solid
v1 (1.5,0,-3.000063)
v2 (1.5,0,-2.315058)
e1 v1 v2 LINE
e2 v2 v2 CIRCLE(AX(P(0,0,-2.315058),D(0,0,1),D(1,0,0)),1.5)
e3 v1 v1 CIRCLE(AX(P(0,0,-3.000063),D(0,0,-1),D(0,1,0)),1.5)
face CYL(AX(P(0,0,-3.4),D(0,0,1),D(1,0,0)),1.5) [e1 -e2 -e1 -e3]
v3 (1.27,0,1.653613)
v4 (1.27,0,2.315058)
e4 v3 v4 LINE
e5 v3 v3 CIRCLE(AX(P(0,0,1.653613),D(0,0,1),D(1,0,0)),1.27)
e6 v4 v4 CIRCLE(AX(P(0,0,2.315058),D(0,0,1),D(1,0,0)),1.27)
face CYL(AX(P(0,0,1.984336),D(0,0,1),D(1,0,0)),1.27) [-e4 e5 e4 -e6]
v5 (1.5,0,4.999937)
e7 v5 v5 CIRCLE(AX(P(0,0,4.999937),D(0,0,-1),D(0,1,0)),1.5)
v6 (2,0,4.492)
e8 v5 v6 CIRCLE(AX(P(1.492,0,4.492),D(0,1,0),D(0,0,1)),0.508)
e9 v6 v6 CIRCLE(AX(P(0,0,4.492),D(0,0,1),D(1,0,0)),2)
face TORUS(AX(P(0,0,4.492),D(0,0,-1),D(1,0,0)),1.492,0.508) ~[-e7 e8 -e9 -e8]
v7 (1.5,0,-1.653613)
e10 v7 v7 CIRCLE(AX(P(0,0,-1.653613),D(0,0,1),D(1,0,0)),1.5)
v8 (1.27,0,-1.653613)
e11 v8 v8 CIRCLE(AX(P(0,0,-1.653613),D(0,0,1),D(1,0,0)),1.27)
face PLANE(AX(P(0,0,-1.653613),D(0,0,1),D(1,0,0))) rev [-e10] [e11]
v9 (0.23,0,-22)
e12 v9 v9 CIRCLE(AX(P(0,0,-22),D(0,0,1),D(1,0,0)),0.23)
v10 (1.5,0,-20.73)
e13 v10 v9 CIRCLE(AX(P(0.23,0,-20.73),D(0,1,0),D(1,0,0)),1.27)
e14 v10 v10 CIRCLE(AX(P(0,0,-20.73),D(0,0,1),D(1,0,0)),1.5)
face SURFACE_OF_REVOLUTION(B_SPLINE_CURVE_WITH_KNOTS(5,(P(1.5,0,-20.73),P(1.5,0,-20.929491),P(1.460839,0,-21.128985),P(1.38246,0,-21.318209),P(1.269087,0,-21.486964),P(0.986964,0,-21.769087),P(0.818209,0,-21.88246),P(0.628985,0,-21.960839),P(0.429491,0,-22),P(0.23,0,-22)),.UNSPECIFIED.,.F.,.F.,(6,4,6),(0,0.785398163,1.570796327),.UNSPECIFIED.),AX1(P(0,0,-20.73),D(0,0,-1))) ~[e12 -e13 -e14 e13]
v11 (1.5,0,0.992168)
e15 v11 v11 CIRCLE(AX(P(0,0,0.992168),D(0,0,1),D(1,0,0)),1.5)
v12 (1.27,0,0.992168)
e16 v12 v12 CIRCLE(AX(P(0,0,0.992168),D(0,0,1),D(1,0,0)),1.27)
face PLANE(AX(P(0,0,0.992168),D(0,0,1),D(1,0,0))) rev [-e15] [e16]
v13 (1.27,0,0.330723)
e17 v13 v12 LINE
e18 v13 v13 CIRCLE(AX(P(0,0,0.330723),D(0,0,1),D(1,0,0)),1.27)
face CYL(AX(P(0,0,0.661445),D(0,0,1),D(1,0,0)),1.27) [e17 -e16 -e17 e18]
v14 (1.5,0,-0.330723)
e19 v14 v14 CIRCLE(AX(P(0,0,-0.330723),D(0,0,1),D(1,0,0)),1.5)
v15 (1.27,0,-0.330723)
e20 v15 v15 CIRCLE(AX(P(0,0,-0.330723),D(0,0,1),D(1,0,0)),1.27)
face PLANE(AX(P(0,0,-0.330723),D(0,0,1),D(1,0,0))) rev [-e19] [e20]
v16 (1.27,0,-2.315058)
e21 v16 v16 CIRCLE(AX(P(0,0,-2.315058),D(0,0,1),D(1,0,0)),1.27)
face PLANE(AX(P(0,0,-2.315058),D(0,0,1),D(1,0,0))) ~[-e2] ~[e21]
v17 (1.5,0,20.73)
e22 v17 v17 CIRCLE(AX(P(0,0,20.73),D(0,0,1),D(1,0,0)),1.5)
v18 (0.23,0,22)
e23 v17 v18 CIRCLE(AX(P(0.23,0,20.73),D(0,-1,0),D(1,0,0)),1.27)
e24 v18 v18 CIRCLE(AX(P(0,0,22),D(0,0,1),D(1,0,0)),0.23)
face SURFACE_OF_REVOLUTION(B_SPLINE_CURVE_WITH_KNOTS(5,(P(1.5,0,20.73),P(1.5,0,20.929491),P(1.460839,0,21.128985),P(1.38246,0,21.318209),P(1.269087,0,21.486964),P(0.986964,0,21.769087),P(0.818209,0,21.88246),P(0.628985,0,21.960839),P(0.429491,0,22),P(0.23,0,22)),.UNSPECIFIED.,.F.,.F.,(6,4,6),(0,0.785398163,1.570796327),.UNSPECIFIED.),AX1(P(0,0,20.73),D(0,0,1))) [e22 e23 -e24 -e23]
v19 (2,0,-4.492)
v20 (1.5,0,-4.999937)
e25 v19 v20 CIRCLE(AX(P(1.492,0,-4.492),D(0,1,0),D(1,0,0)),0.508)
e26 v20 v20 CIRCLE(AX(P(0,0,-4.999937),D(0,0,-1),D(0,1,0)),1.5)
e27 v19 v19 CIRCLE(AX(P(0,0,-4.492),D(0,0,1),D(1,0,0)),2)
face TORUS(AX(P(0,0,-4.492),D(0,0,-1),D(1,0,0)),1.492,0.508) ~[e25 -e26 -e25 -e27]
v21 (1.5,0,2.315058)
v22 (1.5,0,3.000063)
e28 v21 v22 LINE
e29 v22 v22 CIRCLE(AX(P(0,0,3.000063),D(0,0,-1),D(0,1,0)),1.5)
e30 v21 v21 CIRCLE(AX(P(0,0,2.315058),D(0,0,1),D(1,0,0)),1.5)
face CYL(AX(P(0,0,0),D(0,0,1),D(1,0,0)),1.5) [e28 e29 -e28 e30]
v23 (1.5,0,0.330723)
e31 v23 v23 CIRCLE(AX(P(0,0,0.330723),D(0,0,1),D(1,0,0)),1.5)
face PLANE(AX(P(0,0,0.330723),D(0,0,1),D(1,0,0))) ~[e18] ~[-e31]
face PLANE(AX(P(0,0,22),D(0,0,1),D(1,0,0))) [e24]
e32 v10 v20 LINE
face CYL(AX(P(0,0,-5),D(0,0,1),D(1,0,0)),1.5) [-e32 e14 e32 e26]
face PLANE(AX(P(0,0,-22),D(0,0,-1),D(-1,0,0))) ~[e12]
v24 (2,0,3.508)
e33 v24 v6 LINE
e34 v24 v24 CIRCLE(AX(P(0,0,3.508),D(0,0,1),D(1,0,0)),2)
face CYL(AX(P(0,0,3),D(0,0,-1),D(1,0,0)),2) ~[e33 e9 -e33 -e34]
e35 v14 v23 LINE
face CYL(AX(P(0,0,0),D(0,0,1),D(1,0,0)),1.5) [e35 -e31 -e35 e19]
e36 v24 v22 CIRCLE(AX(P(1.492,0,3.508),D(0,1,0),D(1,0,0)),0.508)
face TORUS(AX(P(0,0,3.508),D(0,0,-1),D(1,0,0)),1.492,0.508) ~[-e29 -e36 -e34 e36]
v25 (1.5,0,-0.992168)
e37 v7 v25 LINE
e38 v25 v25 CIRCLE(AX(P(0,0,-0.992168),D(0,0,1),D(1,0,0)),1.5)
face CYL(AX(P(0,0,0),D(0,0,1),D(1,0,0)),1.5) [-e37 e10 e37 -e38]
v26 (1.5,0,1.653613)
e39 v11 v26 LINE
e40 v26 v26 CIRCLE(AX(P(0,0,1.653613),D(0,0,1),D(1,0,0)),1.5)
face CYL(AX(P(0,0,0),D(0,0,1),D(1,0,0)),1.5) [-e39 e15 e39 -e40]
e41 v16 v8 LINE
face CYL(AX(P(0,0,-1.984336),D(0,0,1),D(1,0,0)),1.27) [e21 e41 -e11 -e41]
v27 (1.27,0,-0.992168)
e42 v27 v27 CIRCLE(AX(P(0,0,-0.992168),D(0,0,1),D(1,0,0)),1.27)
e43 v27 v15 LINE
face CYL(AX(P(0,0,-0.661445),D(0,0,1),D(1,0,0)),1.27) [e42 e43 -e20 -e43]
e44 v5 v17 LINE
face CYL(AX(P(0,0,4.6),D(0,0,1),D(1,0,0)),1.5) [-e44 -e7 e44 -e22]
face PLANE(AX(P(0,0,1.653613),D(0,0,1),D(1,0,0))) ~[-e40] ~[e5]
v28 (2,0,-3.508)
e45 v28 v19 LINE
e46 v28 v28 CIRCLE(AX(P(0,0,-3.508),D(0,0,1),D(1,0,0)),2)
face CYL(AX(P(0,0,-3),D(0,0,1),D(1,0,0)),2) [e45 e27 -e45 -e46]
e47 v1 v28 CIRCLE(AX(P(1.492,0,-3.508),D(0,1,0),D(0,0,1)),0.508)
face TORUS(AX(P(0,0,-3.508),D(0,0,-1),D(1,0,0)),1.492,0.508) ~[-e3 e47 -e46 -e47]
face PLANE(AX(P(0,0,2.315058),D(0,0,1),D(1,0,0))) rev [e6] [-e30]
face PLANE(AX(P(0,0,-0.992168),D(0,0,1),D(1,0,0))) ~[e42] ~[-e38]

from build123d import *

# Parameters (mm, degrees)
F0_R          = 1.5
F1_DEPTH      = 3
F2_R          = 2
F3_DEPTH      = 2
F4_R          = 1.5
F5_DEPTH      = 17
F6_R          = 1.27
F8_W          = 0.5104065668
F8_H          = 0.6614452832
F10_S5_R      = 1.5
F10_T6_DEPTH  = 5
F10_S11_R     = 1.5
F10_T12_DEPTH = 5
F10_S17_R     = 1.5
F10_T18_DEPTH = 5
F10_S23_R     = 1.5
F10_T24_DEPTH = 5


# Not quite as in the source:
# - a fillet or chamfer that OpenCascade refuses, or shapes differently, is made with other operations: its cross-section is extruded or revolved along the edge and cut away or added


with BuildPart() as f1:
    # F0 (on Top) → F1 (new body, symmetric)
    with BuildSketch(Plane.XY):
        Circle(F0_R)
    extrude(amount=F1_DEPTH, both=True)

    # F2 (on face) → F3 (join)
    with BuildSketch(Plane.XY.offset(3)):
        Circle(F2_R)
    extrude(amount=F3_DEPTH)

    # F4 (on face) → F5 (join)
    with BuildSketch(Plane.XY.offset(5)):
        Circle(F4_R)
    extrude(amount=F5_DEPTH)

    # F6
    f6_edges = [f1.edges().sort_by_distance(p)[0] for p in [
        (-1.5, 0, 22),
    ]]
    fillet(f6_edges, radius=F6_R)

    # F7: F1 across plane


with BuildPart() as f1_1:
    add(f1.part)
    add(f1.part.mirror(Plane.XY))

    # F8 (on Front) → F9 (revolve, cut)
    with BuildSketch(Plane.XZ):
        with Locations((1.5252032834, 1.9843358497)):
            Rectangle(F8_W, F8_H)
        with Locations((1.5252032834, 0.6614452832)):
            Rectangle(F8_W, F8_H)
        with Locations((1.5252032834, -0.6614452832)):
            Rectangle(F8_W, F8_H)
        with Locations((1.5252032834, -1.9843358497)):
            Rectangle(F8_W, F8_H)
    revolve(axis=Axis((0, 0, 0.6306489231), (0, 0, 1)), mode=Mode.SUBTRACT)

    # F10: fillet of radius 0.508 on 4 edges, made by hand


with BuildPart() as f10_tool2:
    # F10_s3 → F10_t4 (revolve)
    with BuildSketch(Plane.XZ):
        with BuildLine():
            ThreePointArc((1.492, 5), (1.8512102448, 4.8512102448), (2, 4.492))
            Line((2, 4.492), (2, 5))
            Line((2, 5), (1.492, 5))
        make_face()
    revolve(axis=Axis((0, 0, 5), (0, 0, 1)))

    # F10_s5 → F10_t6 (cut, symmetric)
    with BuildSketch(Plane.XY.offset(4.6)):
        Circle(F10_S5_R)
    extrude(amount=F10_T6_DEPTH, both=True, mode=Mode.SUBTRACT)


with BuildPart() as f1_2:
    add(f1_1.part)

    # F10_t1: cut F10_tool2
    add(f10_tool2.part, mode=Mode.SUBTRACT)


with BuildPart() as f10_tool8:
    # F10_s9 → F10_t10 (revolve)
    with BuildSketch(Plane.XZ):
        with BuildLine():
            ThreePointArc((2, 3.508), (1.8512102448, 3.1487897552), (1.492, 3))
            Line((1.492, 3), (2, 3))
            Line((2, 3), (2, 3.508))
        make_face()
    revolve(axis=Axis((0, 0, 3), (0, 0, 1)))

    # F10_s11 → F10_t12 (cut, symmetric)
    with BuildSketch(Plane.XY.offset(3.3)):
        Circle(F10_S11_R)
    extrude(amount=F10_T12_DEPTH, both=True, mode=Mode.SUBTRACT)


with BuildPart() as f1_3:
    add(f1_2.part)

    # F10_t7: cut F10_tool8
    add(f10_tool8.part, mode=Mode.SUBTRACT)


with BuildPart() as f10_tool14:
    # F10_s15 → F10_t16 (revolve)
    with BuildSketch(Plane.XZ):
        with BuildLine():
            ThreePointArc((1.492, -3), (1.8512102448, -3.1487897552), (2, -3.508))
            Line((2, -3.508), (2, -3))
            Line((2, -3), (1.492, -3))
        make_face()
    revolve(axis=Axis((0, 0, -3), (0, 0, 1)))

    # F10_s17 → F10_t18 (cut, symmetric)
    with BuildSketch(Plane.XY.offset(-3.4)):
        Circle(F10_S17_R)
    extrude(amount=F10_T18_DEPTH, both=True, mode=Mode.SUBTRACT)


with BuildPart() as f1_4:
    add(f1_3.part)

    # F10_t13: cut F10_tool14
    add(f10_tool14.part, mode=Mode.SUBTRACT)


with BuildPart() as f10_tool20:
    # F10_s21 → F10_t22 (revolve)
    with BuildSketch(Plane.XZ):
        with BuildLine():
            ThreePointArc((2, -4.492), (1.8512102448, -4.8512102448), (1.492, -5))
            Line((1.492, -5), (2, -5))
            Line((2, -5), (2, -4.492))
        make_face()
    revolve(axis=Axis((0, 0, -5), (0, 0, 1)))

    # F10_s23 → F10_t24 (cut, symmetric)
    with BuildSketch(Plane.XY.offset(-4.7)):
        Circle(F10_S23_R)
    extrude(amount=F10_T24_DEPTH, both=True, mode=Mode.SUBTRACT)


with BuildPart() as f1_5:
    add(f1_4.part)

    # F10_t19: cut F10_tool20
    add(f10_tool20.part, mode=Mode.SUBTRACT)


solid = f1_5.part
